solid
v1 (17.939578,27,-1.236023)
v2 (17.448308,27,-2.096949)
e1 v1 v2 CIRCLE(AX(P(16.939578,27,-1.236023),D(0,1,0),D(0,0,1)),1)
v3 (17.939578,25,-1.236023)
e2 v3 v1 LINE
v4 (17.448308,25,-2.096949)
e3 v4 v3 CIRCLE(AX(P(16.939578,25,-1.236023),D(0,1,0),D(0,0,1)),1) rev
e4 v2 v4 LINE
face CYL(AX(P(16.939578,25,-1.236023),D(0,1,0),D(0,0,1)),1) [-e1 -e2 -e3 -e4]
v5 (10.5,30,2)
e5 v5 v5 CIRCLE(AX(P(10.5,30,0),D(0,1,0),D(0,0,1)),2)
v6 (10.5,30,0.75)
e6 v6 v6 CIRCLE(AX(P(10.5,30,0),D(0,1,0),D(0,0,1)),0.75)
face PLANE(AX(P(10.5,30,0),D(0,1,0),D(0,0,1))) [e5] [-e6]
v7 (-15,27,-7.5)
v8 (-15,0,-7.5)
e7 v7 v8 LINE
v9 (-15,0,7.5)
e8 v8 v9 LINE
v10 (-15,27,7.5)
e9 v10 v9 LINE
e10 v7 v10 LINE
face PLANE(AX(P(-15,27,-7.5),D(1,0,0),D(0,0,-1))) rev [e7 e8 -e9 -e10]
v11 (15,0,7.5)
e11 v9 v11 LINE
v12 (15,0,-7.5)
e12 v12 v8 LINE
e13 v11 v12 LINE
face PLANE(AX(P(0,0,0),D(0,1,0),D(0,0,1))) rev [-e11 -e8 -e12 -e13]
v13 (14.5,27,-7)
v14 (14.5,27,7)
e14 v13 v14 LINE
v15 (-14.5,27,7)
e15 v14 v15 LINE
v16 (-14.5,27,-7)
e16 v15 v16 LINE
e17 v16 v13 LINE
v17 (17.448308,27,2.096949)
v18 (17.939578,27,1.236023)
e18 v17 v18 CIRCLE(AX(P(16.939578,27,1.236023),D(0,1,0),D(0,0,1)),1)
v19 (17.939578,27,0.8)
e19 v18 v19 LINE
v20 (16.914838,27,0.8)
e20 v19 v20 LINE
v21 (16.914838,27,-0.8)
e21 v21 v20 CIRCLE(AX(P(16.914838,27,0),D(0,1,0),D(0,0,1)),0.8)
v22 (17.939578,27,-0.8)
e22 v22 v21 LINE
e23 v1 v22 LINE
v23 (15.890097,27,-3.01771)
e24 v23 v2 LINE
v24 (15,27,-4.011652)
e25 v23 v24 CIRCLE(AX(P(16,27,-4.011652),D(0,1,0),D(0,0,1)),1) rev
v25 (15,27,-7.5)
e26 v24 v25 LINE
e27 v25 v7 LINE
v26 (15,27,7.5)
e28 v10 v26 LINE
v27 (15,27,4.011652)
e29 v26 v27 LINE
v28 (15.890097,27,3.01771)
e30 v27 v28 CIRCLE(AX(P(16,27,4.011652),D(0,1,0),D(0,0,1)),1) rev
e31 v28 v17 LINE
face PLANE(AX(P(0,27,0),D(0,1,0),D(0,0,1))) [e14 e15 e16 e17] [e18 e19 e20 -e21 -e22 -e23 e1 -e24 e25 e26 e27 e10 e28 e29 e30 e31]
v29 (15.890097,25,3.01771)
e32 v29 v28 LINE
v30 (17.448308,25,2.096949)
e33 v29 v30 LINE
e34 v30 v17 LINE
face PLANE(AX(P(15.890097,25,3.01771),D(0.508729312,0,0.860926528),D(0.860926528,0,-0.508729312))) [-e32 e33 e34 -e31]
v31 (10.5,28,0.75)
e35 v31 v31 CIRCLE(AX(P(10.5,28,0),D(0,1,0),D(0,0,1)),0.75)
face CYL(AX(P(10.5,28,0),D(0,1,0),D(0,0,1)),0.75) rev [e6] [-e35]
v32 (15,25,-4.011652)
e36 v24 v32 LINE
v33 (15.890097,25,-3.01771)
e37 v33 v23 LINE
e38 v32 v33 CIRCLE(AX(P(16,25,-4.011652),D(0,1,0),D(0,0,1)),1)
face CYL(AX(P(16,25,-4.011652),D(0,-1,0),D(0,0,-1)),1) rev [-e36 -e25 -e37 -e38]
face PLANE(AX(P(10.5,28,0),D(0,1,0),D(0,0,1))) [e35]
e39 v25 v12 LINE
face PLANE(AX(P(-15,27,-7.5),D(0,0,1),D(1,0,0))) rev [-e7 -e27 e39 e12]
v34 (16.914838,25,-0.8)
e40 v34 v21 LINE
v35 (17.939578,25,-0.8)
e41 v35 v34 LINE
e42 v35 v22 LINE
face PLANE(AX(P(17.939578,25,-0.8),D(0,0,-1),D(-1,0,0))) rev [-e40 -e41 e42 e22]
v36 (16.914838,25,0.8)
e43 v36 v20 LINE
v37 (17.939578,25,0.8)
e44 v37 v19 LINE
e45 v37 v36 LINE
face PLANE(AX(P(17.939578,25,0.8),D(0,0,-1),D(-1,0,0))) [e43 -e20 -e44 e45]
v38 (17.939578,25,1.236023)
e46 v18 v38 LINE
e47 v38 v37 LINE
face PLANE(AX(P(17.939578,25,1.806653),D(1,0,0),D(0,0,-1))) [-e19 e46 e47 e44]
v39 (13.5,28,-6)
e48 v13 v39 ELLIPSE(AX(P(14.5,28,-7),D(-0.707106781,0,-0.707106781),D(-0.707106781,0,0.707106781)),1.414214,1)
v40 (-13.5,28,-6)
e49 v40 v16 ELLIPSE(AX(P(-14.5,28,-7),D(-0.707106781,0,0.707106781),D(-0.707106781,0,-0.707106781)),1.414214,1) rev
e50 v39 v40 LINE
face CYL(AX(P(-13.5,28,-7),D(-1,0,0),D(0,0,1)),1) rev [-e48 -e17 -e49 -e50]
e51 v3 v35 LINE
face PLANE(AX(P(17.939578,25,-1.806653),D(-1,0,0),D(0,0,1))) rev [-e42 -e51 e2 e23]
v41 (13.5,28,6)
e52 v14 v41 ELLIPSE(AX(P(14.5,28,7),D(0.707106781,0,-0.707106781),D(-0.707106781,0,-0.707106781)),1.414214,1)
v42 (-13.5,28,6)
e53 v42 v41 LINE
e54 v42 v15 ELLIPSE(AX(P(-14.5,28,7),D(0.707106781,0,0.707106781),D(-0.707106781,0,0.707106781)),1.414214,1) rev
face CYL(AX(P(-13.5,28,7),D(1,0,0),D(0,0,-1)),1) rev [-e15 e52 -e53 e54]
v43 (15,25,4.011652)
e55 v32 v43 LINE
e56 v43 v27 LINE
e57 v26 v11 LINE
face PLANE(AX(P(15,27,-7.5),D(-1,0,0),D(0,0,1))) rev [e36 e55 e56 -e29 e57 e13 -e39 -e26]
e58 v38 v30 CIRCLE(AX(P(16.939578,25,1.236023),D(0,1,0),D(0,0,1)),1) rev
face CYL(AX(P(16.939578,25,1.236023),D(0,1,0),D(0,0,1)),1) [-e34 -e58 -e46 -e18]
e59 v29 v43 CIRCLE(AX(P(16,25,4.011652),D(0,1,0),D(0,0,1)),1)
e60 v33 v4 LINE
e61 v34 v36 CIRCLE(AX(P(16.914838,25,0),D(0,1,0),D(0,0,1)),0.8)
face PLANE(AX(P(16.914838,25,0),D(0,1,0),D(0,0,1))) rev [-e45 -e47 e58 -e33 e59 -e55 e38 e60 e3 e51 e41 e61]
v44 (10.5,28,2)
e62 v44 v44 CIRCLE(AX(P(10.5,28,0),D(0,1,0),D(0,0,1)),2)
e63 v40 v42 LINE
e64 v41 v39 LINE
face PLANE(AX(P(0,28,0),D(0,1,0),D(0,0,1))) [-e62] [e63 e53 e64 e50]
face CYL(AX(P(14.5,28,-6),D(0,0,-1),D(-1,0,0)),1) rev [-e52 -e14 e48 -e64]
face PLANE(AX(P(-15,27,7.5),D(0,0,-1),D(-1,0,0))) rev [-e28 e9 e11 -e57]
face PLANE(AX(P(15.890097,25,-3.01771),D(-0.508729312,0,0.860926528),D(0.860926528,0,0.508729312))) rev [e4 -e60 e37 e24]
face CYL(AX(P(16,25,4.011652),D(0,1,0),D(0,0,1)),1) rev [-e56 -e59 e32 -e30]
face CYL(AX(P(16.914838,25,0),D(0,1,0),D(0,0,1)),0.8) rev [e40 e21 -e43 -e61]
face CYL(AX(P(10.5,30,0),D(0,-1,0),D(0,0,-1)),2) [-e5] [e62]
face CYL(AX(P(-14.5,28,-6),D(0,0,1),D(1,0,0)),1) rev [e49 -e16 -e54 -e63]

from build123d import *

# Parameters (mm, degrees)
SKETCH1_W           = 30
SKETCH1_H           = 15
BOSS_EXTRUDE1_DEPTH = 27
SKETCH8_W           = 27
SKETCH8_H           = 12
BOSS_EXTRUDE5_DEPTH = 1
FILLET4_R           = 1
SKETCH9_R           = 2
BOSS_EXTRUDE6_DEPTH = 2
SKETCH10_R          = 0.75
CUT_EXTRUDE2_DEPTH  = 2
BOSS_EXTRUDE7_DEPTH = 2
FILLET5_R           = 1


# Some blends are built 0.0001 mm under size
with BuildPart() as part:
    # Sketch1 → Boss-Extrude1 (new body)
    with BuildSketch(Plane(origin=(0, 0, 0), x_dir=(1, 0, 0), z_dir=(0, 1, 0))):
        Rectangle(SKETCH1_W, SKETCH1_H)
    extrude(amount=BOSS_EXTRUDE1_DEPTH)

    # Sketch8 → Boss-Extrude5 (add)
    with BuildSketch(Plane(origin=(0, 27, 0), x_dir=(1, 0, 0), z_dir=(0, 1, 0))):
        Rectangle(SKETCH8_W, SKETCH8_H)
    extrude(amount=BOSS_EXTRUDE5_DEPTH)

    # Fillet4
    fillet4_edges = [part.edges().sort_by_distance(p)[0] for p in [
        (0, 27, 6),
        (13.5, 27, 0),
        (-13.5, 27, 0),
        (0, 27, -6),
    ]]
    fillet(fillet4_edges, radius=FILLET4_R - 0.0001)  # a hair under: the kernel refuses the full size

    # Sketch9 → Boss-Extrude6 (add)
    with BuildSketch(Plane(origin=(0, 28, 0), x_dir=(1, 0, 0), z_dir=(0, 1, 0))):
        with Locations(Location((10.5, 0, 0), (0, 0, 270))):
            Circle(SKETCH9_R)
    extrude(amount=BOSS_EXTRUDE6_DEPTH)

    # Sketch10 → Cut-Extrude2 (cut)
    with BuildSketch(Plane(origin=(0, 30, 0), x_dir=(1, 0, 0), z_dir=(0, 1, 0))):
        with Locations(Location((10.5, 0, 0), (0, 0, 270))):
            Circle(SKETCH10_R)
    extrude(amount=-CUT_EXTRUDE2_DEPTH, mode=Mode.SUBTRACT)

    # Sketch11 → Boss-Extrude7 (add)
    with BuildSketch(Plane(origin=(0, 27, 0), x_dir=(1, 0, 0), z_dir=(0, 1, 0))):
        with BuildLine():
            Line((15, 3.017710153), (15.890097225, 3.017710153))
            Line((15.890097225, 3.017710153), (17.939578486, 1.806653045))
            Line((17.939578486, 1.806653045), (17.939578486, 0.8))
            Line((17.939578486, 0.8), (16.914837856, 0.8))
            ThreePointArc((16.914837856, 0.8), (16.114837856, 0), (16.914837856, -0.8))
            Line((16.914837856, -0.8), (17.939578486, -0.8))
            Line((17.939578486, -0.8), (17.939578486, -1.806653045))
            Line((17.939578486, -1.806653045), (15.890097225, -3.017710153))
            Line((15.890097225, -3.017710153), (15, -3.017710153))
            Line((15, -3.017710153), (15, 3.017710153))
        make_face()
    extrude(amount=-BOSS_EXTRUDE7_DEPTH)

    # Fillet5
    # the kernel refuses this fillet: 1 mm, written as the material it adds along each edge
    with BuildSketch(Plane(origin=(15, 27, 3.017710153), x_dir=(0, 0, 1), z_dir=(0, -1, 0))) as fillet5_piece_1:
        with BuildLine():
            CenterArc((0.993942342, -1), FILLET5_R, 90, 83.690289012)
            Line((0, -0.890097225), (0, 0))
            Line((0, 0), (0.993942342, 0))
        make_face()
    extrude(amount=2)
    with BuildSketch(Plane(origin=(15, 27, -3.017710153), x_dir=(0, 0, -1), z_dir=(0, -1, 0))) as fillet5_piece_2:
        with BuildLine():
            CenterArc((0.993942342, 1), FILLET5_R, 186.309710988, 83.690289012)
            Line((0, 0.890097225), (0, 0))
            Line((0, 0), (0.993942342, 0))
        make_face()
    extrude(amount=2)
    # the kernel refuses this fillet: 1 mm, written as the material it takes off along each edge
    with BuildSketch(Plane(origin=(17.939578486, 28.426575532, -1.806653045), x_dir=(0, 0, 1), z_dir=(0, -1, 0)), Plane(origin=(17.939578486, 28.426575532, 1.806653045), x_dir=(-0.8609265282144232, 0, 0.5087293121264587), z_dir=(0, -1, 0))) as fillet5_2_piece_1:
        with BuildLine():
            CenterArc((FILLET5_R * 0.570630212653, FILLET5_R), FILLET5_R, 210.579226872, 59.420773128)
            Line((-FILLET5_R * 0.290296315561, FILLET5_R * 0.491270687874), (0, 0))
            Line((0, 0), (FILLET5_R * 0.570630212653, 0))
        make_face()
    extrude(amount=4.853151063, mode=Mode.SUBTRACT)


solid = part.part
